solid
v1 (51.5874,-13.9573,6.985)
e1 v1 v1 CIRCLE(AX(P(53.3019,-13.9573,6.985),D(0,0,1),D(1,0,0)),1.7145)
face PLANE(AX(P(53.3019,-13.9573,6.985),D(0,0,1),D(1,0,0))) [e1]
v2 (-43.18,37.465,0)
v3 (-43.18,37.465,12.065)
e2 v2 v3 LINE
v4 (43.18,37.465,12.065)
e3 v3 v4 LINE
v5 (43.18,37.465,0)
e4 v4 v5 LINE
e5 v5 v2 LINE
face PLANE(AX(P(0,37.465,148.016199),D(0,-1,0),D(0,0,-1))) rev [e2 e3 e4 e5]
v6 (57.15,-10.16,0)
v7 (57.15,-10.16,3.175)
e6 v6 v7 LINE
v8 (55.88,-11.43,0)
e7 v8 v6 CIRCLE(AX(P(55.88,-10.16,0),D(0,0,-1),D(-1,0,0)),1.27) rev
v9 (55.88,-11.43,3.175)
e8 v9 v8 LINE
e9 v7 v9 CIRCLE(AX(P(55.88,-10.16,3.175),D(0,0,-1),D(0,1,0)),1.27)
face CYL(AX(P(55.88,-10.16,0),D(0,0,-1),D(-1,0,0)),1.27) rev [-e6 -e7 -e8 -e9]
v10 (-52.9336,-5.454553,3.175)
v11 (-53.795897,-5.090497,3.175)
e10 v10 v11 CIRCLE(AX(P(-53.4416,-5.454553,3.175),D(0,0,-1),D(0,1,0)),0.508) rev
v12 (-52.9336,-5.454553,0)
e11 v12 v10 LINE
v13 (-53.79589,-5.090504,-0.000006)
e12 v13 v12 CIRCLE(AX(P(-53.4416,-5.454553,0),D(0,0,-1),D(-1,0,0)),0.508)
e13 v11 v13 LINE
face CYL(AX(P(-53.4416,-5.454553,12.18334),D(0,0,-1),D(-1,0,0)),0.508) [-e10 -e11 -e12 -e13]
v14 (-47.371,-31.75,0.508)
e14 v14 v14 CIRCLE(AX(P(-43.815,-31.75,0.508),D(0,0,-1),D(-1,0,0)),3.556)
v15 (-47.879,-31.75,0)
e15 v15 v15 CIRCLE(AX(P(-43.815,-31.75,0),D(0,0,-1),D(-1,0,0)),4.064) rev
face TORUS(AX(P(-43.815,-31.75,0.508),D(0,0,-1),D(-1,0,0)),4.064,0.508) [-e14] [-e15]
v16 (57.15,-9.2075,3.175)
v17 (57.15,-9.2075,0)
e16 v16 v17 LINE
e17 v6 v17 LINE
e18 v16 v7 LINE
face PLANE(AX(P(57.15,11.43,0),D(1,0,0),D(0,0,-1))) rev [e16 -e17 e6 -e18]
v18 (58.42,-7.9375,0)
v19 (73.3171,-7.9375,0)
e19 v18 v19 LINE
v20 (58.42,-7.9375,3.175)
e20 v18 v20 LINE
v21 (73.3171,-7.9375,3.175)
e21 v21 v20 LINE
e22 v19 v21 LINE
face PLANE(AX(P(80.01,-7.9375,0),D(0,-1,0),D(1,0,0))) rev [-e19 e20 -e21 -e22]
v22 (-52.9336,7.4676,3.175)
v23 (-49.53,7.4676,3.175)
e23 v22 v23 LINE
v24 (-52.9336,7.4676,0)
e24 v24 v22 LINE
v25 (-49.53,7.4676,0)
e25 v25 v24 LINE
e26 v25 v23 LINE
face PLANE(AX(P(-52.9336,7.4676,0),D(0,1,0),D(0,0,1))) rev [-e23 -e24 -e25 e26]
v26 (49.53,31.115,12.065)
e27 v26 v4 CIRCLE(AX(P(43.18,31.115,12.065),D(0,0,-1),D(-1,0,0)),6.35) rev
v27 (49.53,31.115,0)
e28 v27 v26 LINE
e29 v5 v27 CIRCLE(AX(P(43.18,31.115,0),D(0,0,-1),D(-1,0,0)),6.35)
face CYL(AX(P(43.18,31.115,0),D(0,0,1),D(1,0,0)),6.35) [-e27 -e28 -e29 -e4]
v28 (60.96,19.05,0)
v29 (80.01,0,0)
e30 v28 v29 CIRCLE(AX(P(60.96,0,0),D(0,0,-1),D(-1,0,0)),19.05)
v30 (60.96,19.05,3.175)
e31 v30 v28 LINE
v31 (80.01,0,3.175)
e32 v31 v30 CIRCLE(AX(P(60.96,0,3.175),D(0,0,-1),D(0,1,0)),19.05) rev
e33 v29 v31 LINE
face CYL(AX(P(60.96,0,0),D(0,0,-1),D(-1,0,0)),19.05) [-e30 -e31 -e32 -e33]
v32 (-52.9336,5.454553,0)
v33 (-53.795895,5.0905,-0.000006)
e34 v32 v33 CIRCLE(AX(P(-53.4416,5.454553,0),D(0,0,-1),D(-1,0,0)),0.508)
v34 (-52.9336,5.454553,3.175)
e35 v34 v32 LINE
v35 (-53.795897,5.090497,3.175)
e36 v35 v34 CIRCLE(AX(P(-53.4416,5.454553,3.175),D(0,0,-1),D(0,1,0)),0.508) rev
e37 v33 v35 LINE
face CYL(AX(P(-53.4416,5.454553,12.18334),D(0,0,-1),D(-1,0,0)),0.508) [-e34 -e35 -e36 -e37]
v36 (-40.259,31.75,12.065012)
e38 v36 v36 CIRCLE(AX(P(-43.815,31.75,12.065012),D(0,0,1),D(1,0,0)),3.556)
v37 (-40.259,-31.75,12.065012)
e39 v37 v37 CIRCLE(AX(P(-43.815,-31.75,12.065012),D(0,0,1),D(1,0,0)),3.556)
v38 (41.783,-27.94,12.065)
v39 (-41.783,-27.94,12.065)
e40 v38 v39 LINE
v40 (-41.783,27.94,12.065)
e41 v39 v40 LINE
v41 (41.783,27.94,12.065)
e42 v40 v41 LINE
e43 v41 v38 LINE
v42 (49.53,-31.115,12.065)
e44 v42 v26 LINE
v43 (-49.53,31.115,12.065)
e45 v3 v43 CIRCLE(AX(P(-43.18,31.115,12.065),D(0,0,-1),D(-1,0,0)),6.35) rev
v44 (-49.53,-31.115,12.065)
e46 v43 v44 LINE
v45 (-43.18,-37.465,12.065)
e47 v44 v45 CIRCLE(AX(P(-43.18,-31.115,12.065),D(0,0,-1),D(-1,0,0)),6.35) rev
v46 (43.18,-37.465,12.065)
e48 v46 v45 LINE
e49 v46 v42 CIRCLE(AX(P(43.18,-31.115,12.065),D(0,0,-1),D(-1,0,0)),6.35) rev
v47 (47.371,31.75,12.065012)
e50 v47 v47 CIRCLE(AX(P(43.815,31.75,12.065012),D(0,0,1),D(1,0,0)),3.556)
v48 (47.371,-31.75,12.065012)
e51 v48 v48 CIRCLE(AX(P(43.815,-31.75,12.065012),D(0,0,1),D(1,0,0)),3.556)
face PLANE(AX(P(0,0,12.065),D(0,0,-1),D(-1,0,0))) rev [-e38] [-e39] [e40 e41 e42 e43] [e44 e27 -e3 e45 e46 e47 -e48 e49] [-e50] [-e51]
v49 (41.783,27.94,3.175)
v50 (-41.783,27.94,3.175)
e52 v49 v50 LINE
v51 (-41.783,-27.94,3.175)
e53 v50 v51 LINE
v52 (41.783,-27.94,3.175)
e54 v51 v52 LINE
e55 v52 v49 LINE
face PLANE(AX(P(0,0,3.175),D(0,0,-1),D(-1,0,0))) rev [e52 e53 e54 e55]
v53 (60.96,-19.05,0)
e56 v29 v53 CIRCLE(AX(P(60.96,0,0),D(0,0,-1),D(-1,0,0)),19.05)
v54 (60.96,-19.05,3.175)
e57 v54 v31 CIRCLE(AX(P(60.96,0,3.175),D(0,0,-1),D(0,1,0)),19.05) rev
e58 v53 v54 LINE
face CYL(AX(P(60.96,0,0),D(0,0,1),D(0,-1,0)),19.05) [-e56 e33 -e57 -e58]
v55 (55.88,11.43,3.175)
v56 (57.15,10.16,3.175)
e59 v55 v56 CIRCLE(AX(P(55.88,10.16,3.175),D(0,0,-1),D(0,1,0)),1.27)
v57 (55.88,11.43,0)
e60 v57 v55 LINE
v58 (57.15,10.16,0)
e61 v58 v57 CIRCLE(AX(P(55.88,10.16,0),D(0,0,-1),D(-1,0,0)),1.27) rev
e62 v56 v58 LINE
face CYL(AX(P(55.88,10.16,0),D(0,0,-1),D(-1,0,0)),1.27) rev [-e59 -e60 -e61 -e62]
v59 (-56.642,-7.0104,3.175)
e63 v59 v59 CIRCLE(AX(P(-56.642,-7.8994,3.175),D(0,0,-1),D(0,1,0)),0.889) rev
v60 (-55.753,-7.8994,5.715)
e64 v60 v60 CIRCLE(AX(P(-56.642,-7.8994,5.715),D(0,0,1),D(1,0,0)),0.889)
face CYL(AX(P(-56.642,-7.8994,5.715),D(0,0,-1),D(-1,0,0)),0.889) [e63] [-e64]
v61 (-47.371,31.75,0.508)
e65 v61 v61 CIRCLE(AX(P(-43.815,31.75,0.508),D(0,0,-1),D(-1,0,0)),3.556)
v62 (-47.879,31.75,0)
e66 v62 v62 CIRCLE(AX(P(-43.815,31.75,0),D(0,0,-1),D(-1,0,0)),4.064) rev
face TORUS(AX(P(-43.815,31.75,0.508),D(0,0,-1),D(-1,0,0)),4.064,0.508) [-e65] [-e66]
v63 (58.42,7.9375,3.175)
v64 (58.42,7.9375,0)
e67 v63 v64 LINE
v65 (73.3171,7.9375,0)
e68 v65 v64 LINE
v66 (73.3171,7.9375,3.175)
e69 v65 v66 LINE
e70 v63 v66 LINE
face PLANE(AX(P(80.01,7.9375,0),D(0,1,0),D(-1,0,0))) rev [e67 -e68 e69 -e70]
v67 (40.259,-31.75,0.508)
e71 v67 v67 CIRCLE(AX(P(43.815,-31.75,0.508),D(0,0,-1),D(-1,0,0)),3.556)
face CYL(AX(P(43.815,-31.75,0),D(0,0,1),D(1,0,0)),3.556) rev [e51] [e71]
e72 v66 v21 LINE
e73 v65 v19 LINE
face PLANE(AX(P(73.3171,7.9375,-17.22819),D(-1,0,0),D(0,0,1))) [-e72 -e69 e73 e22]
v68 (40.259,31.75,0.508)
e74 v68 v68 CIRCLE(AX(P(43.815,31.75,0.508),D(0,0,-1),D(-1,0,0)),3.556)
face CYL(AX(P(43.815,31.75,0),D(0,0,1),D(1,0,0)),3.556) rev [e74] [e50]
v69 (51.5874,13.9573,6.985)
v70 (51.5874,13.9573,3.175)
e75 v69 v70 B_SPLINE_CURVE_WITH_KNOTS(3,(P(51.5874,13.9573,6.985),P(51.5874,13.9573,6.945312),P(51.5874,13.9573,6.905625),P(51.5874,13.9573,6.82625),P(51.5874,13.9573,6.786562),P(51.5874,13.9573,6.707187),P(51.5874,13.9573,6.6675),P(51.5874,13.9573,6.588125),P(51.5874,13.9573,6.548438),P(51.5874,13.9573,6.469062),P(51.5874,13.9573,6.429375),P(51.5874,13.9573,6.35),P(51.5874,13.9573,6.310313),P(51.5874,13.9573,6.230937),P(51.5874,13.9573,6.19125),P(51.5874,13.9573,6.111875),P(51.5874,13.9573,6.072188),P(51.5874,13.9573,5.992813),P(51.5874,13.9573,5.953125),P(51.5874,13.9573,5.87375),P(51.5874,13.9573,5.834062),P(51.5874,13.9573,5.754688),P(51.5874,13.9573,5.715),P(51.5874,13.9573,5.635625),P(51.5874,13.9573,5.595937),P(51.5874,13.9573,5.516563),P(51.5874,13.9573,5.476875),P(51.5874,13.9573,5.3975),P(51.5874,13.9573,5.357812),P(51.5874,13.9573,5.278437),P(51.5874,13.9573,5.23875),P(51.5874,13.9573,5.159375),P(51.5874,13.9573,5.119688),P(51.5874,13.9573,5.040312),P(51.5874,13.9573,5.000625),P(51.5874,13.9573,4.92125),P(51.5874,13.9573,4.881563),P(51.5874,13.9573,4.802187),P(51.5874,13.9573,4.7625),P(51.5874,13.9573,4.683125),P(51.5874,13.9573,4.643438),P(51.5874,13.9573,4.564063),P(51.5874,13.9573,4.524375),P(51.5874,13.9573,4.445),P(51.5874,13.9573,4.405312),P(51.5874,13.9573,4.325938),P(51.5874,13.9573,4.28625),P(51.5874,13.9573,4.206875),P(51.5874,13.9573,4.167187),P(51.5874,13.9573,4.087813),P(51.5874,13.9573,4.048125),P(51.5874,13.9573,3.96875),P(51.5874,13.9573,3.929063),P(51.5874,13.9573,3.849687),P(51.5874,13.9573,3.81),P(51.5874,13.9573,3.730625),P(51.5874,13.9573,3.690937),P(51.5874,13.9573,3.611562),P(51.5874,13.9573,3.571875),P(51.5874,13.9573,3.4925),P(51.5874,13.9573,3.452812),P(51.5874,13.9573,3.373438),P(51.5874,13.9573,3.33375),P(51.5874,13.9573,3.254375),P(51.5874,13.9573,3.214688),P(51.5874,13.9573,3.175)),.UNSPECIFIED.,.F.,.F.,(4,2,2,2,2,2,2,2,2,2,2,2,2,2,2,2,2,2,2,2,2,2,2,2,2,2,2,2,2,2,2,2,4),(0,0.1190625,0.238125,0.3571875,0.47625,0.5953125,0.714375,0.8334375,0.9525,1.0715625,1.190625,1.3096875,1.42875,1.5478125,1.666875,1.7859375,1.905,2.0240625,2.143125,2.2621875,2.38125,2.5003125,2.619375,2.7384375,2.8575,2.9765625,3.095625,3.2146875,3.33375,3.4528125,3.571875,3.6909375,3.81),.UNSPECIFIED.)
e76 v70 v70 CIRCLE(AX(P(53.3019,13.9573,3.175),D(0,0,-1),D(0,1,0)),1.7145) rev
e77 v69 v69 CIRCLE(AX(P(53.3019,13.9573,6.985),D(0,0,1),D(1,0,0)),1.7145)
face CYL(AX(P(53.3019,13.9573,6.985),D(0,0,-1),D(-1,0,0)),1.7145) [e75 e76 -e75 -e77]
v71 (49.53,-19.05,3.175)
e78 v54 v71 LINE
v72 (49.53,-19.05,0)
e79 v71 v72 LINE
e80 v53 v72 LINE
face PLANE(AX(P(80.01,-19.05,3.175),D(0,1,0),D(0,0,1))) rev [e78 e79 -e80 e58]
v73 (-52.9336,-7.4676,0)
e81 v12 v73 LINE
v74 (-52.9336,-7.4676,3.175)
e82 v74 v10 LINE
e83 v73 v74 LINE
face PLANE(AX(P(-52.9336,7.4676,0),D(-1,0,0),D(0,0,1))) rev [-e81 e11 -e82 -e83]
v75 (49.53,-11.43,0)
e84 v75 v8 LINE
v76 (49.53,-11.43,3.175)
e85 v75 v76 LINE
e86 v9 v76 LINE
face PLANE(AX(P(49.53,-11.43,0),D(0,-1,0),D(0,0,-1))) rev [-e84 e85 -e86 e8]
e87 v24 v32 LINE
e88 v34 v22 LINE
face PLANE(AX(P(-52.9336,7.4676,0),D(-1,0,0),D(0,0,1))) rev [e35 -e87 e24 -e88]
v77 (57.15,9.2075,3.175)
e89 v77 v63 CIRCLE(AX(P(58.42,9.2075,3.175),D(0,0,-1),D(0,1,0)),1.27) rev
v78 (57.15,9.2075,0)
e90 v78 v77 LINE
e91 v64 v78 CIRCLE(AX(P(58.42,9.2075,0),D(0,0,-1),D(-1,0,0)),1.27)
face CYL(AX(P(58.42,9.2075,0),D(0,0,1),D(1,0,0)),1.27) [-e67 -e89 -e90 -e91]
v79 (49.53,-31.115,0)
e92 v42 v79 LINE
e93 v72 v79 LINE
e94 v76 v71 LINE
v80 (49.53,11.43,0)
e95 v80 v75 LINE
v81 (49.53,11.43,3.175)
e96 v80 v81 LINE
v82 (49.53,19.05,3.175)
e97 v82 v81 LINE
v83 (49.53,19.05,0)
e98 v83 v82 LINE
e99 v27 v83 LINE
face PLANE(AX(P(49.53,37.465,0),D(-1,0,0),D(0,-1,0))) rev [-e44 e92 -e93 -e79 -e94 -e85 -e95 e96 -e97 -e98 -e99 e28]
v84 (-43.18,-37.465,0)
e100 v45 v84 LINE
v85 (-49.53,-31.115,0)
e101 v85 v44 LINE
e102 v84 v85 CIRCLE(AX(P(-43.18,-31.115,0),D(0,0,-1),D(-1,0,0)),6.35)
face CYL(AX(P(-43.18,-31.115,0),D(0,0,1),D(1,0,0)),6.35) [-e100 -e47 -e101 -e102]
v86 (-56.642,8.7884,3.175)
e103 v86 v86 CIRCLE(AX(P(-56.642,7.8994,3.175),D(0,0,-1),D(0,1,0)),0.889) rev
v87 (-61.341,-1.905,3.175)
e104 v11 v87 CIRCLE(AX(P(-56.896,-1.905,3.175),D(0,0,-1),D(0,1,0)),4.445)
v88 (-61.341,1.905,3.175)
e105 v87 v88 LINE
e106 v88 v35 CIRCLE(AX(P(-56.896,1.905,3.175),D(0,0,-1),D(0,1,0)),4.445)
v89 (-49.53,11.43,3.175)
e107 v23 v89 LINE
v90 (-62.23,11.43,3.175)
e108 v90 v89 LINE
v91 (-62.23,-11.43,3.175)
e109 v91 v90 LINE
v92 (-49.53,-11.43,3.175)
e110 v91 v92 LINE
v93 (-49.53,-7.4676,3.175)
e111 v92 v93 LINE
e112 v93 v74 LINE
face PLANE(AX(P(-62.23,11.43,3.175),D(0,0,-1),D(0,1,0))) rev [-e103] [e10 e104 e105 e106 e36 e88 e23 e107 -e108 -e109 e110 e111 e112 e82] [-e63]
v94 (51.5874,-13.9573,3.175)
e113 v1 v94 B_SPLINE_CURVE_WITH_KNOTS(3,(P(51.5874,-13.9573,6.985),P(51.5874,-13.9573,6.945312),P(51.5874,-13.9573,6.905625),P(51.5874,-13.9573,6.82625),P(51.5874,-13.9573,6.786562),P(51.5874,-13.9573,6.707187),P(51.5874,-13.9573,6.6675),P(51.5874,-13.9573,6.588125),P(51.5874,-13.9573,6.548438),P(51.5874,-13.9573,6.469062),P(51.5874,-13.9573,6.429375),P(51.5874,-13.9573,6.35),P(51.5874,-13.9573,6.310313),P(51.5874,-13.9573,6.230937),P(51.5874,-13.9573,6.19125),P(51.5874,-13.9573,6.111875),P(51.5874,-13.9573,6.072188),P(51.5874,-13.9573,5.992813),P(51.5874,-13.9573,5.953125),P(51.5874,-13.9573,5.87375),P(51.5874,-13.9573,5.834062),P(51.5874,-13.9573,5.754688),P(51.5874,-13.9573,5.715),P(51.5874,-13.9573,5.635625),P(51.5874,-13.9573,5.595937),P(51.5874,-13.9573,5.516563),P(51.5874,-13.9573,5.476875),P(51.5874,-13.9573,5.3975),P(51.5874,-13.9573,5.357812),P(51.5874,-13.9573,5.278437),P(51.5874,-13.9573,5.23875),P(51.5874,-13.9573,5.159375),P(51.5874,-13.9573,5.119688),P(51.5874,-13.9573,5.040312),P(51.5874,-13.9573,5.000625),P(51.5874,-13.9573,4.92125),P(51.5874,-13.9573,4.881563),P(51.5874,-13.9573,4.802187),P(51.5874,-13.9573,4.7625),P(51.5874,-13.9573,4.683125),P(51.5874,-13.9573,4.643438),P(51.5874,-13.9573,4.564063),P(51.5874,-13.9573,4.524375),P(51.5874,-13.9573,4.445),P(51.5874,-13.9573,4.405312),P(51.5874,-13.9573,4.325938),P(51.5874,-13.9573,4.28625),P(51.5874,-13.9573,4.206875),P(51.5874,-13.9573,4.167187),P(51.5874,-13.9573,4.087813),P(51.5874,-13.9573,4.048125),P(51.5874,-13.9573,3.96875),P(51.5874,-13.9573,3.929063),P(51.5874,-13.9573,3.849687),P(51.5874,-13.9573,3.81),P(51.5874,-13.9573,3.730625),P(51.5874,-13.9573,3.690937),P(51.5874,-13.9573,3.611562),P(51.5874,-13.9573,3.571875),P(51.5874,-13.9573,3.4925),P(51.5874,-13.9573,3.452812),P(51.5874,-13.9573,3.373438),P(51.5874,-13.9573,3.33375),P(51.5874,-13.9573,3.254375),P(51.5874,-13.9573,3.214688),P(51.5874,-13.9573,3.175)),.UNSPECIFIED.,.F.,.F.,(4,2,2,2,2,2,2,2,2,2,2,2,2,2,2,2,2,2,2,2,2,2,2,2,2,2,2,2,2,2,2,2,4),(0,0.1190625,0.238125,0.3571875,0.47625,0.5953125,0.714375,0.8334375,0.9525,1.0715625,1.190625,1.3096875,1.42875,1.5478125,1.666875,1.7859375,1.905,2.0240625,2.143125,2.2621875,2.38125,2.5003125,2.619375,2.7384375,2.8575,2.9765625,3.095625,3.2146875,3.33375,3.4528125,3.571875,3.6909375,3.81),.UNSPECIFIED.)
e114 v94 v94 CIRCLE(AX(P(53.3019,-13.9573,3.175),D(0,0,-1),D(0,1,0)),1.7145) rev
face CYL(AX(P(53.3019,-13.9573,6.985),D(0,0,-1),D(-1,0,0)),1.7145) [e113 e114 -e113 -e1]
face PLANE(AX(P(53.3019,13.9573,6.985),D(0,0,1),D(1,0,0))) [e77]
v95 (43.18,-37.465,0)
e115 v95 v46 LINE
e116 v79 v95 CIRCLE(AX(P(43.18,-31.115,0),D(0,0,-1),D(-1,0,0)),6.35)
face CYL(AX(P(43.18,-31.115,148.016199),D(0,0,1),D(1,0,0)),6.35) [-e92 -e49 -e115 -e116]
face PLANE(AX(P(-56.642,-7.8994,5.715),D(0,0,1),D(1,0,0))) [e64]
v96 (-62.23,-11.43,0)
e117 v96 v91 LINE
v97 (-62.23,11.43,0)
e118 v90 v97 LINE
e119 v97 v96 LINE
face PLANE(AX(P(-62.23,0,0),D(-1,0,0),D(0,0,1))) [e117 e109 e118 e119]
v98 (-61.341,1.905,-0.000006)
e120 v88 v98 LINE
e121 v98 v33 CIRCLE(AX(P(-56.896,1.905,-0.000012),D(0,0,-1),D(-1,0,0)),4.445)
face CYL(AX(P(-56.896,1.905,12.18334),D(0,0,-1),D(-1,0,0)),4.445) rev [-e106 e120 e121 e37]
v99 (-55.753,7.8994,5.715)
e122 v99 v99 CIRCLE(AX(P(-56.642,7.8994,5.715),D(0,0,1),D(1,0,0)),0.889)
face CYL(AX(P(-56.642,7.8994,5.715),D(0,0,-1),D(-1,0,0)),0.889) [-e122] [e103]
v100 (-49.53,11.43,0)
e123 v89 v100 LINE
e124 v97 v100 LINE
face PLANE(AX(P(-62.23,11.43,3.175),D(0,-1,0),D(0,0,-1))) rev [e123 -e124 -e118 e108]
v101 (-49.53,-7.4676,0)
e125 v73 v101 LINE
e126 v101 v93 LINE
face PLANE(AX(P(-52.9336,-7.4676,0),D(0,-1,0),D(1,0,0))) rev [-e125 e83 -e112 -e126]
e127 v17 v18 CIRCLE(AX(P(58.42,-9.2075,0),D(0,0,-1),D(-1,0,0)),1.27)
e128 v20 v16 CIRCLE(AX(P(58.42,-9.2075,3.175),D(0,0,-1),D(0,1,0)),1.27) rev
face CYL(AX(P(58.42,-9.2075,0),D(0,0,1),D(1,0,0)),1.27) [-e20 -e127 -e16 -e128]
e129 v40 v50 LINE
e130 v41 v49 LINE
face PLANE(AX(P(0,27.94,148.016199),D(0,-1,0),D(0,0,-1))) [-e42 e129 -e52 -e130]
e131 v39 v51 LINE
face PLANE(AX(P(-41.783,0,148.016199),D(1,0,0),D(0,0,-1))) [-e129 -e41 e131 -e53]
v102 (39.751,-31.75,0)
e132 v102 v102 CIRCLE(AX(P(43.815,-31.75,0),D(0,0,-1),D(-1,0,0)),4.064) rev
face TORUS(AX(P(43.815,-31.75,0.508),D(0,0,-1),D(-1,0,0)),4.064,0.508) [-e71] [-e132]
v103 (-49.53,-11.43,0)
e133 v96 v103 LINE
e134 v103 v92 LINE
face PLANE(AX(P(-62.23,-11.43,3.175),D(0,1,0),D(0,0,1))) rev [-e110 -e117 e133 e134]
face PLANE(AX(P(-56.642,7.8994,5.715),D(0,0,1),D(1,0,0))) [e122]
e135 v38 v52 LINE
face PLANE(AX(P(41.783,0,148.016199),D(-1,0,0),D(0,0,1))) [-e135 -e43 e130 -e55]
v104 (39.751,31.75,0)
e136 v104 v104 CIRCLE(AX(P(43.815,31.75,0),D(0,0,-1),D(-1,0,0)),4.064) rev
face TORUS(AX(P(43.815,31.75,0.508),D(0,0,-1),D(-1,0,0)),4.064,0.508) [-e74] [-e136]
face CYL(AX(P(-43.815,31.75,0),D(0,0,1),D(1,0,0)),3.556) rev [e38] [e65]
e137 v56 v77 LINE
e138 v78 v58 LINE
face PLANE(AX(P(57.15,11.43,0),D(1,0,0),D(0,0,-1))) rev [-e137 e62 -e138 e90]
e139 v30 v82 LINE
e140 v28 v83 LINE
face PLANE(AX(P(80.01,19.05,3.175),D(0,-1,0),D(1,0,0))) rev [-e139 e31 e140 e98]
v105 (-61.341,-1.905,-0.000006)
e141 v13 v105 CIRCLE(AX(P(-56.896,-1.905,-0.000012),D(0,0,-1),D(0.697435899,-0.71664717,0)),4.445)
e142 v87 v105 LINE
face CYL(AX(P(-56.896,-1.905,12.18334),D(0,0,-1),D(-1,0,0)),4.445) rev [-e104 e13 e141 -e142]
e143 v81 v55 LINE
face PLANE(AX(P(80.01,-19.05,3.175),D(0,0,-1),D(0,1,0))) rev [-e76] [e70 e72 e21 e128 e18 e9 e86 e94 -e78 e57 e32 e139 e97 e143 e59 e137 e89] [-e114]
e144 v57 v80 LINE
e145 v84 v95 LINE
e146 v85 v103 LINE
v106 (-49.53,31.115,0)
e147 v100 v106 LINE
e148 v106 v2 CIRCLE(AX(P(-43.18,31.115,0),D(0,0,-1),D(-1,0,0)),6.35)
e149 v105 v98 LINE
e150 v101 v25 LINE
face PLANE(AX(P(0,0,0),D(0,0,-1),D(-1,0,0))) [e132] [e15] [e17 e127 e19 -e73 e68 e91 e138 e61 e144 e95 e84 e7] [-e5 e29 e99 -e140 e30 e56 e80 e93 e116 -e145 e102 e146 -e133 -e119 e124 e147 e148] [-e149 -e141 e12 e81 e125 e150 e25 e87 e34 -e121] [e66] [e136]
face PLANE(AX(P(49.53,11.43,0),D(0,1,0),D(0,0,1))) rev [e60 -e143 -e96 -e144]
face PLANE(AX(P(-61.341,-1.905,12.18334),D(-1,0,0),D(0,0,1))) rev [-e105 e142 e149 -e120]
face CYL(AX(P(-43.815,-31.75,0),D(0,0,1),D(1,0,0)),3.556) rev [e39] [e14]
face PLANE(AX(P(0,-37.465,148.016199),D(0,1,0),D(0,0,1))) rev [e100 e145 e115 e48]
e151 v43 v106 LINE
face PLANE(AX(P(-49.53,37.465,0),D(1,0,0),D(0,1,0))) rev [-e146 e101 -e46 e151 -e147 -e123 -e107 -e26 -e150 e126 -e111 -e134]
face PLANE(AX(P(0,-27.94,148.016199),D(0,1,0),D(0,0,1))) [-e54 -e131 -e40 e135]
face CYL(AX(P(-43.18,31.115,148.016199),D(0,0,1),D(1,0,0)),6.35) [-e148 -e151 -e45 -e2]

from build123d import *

# Parameters (mm, degrees)
SKETCH1_W               = 55.88
SKETCH1_H               = 83.566
BOSS_EXTRUDE1_DEPTH     = 3.175
SKETCH2_W               = 74.93
SKETCH2_H               = 102.616
SKETCH2_W_2             = 55.88
SKETCH2_H_2             = 83.566
BOSS_EXTRUDE2_DEPTH     = 12.065
CUT_EXTRUDE1_DEPTH      = 65.666075449
CUT_EXTRUDE1_DEPTH_BACK = 65.666075449
SKETCH3_R               = 3.556
CUT_EXTRUDE2_DEPTH      = 65.666075449
CUT_EXTRUDE2_DEPTH_BACK = 65.666075449
SKETCH4_W               = 1.778
SKETCH4_H               = 74.93
FILLET1_R               = 6.35
FILLET2_R               = 0.508
SKETCH5_W               = 38.1
SKETCH5_H               = 3.175
BOSS_EXTRUDE3_DEPTH     = 30.48
CUT_EXTRUDE3_DEPTH      = 89.793346738
CUT_EXTRUDE3_DEPTH_BACK = 89.793346738
SKETCH6_W               = 7.62
SKETCH6_H               = 22.86
SKETCH7_R               = 1.7145
BOSS_EXTRUDE4_DEPTH     = 3.81
CUT_EXTRUDE4_DEPTH      = 89.793346738
CUT_EXTRUDE4_DEPTH_BACK = 89.793346738
SKETCH8_W               = 22.86
SKETCH8_H               = 15.875
SKETCH9_W               = 6.6929
SKETCH9_H               = 15.875
BOSS_EXTRUDE5_DEPTH     = 3.175
FILLET3_R               = 19.05
FILLET5_R               = 1.27
SKETCH10_W              = 22.86
SKETCH10_H              = 3.175
BOSS_EXTRUDE6_DEPTH     = 12.7
CUT_EXTRUDE5_DEPTH      = 89.793346738
CUT_EXTRUDE5_DEPTH_BACK = 89.793346738
SKETCH11_W              = 3.4036
SKETCH11_H              = 14.9352
CUT_EXTRUDE6_DEPTH      = 90.167205575
CUT_EXTRUDE6_DEPTH_BACK = 90.167205575
FILLET7_R               = 0.508
SKETCH13_R              = 0.889
BOSS_EXTRUDE7_DEPTH     = 2.54


with BuildPart() as part:
    # Sketch1 → Boss-Extrude1 (new body)
    with BuildSketch(Plane(origin=(0, 0, 0), x_dir=(0, 1, 0), z_dir=(0, 0, 1))):
        Rectangle(SKETCH1_W, SKETCH1_H)
    extrude(amount=BOSS_EXTRUDE1_DEPTH)

    # Sketch2 → Boss-Extrude2 (add)
    with BuildSketch(Plane(origin=(0, 0, 0), x_dir=(0, 1, 0), z_dir=(0, 0, 1))):
        Rectangle(SKETCH2_W, SKETCH2_H)
        Rectangle(SKETCH2_W_2, SKETCH2_H_2, mode=Mode.SUBTRACT)
    extrude(amount=BOSS_EXTRUDE2_DEPTH)

    # Sketch3 → Cut-Extrude1 (cut, two sides: drawn at the far end of the back side and taken through both)
    with BuildSketch(Plane.XY.offset(12.065).offset(-CUT_EXTRUDE1_DEPTH_BACK)):
        with Locations((-43.815, 31.75)):
            Circle(SKETCH3_R)
        with Locations((43.815, 31.75)):
            Circle(SKETCH3_R)
        with Locations((43.815, -31.75)):
            Circle(SKETCH3_R)
        with Locations((-43.815, -31.75)):
            Circle(SKETCH3_R)
    extrude(amount=CUT_EXTRUDE1_DEPTH + CUT_EXTRUDE1_DEPTH_BACK, mode=Mode.SUBTRACT)

    # Sketch4 → Cut-Extrude2 (cut, two sides: drawn at the far end of the back side and taken through both)
    with BuildSketch(Plane.XY.offset(12.065).offset(-CUT_EXTRUDE2_DEPTH_BACK)):
        with Locations((-50.419, 0)):
            Rectangle(SKETCH4_W, SKETCH4_H)
        with Locations((50.419, 0)):
            Rectangle(SKETCH4_W, SKETCH4_H)
    extrude(amount=CUT_EXTRUDE2_DEPTH + CUT_EXTRUDE2_DEPTH_BACK, mode=Mode.SUBTRACT)

    # Fillet1
    fillet1_edges = [part.edges().sort_by_distance(p)[0] for p in [
        (-49.53, -37.465, 6.0325),
        (-49.53, 37.465, 6.0325),
        (49.53, 37.465, 6.0325),
        (49.53, -37.465, 6.0325),
    ]]
    fillet(fillet1_edges, radius=FILLET1_R)

    # Fillet2
    fillet2_edges = [part.edges().sort_by_distance(p)[0] for p in [
        (-47.371, -31.75, 0),
        (40.259, -31.75, 0),
        (40.259, 31.75, 0),
        (-47.371, 31.75, 0),
    ]]
    fillet(fillet2_edges, radius=FILLET2_R)

    # Sketch5 → Boss-Extrude3 (add)
    with BuildSketch(Plane.YZ.offset(49.53)):
        with Locations((0, 1.5875)):
            Rectangle(SKETCH5_W, SKETCH5_H)
    extrude(amount=BOSS_EXTRUDE3_DEPTH)

    # Sketch6 → Cut-Extrude3 (cut, two sides: drawn at the far end of the back side and taken through both)
    with BuildSketch(Plane.XY.offset(3.175).offset(-CUT_EXTRUDE3_DEPTH_BACK)):
        with Locations((53.34, 0)):
            Rectangle(SKETCH6_W, SKETCH6_H)
    extrude(amount=CUT_EXTRUDE3_DEPTH + CUT_EXTRUDE3_DEPTH_BACK, mode=Mode.SUBTRACT)

    # Sketch7 → Boss-Extrude4 (add)
    with BuildSketch(Plane.XY.offset(3.175)):
        with Locations(Location((53.3019, 13.9573, 0), (0, 0, 180))):
            Circle(SKETCH7_R)
        with Locations(Location((53.3019, -13.9573, 0), (0, 0, 180))):
            Circle(SKETCH7_R)
    extrude(amount=BOSS_EXTRUDE4_DEPTH)

    # Sketch8 → Cut-Extrude4 (cut, two sides: drawn at the far end of the back side and taken through both)
    with BuildSketch(Plane.XY.offset(3.175).offset(-CUT_EXTRUDE4_DEPTH_BACK)):
        with Locations((68.58, 0)):
            Rectangle(SKETCH8_W, SKETCH8_H)
    extrude(amount=CUT_EXTRUDE4_DEPTH + CUT_EXTRUDE4_DEPTH_BACK, mode=Mode.SUBTRACT)

    # Sketch9 → Boss-Extrude5 (add)
    with BuildSketch(Plane.XY.offset(3.175)):
        with Locations((76.66355, 0)):
            Rectangle(SKETCH9_W, SKETCH9_H)
    extrude(amount=-BOSS_EXTRUDE5_DEPTH)

    # Fillet3
    fillet3_edges = [part.edges().sort_by_distance(p)[0] for p in [
        (80.01, -19.05, 1.5875),
        (80.01, 19.05, 1.5875),
    ]]
    fillet(fillet3_edges, radius=FILLET3_R - 0.0001)  # a hair under: the kernel refuses the full size

    # Fillet5
    fillet5_edges = [part.edges().sort_by_distance(p)[0] for p in [
        (57.15, 11.43, 1.5875),
        (57.15, -11.43, 1.5875),
        (57.15, 7.9375, 1.5875),
        (57.15, -7.9375, 1.5875),
    ]]
    fillet(fillet5_edges, radius=FILLET5_R)

    # Sketch10 → Boss-Extrude6 (add)
    with BuildSketch(Plane(origin=(-49.53, 0, 0), x_dir=(0, -1, 0), z_dir=(-1, 0, 0))):
        with Locations((0, 1.5875)):
            Rectangle(SKETCH10_W, SKETCH10_H)
    extrude(amount=BOSS_EXTRUDE6_DEPTH)

    # Sketch11 → Cut-Extrude5 (cut, two sides: drawn at the far end of the back side and taken through both)
    with BuildSketch(Plane.XY.offset(3.175).offset(-CUT_EXTRUDE5_DEPTH_BACK)):
        with Locations((-51.2318, 0)):
            Rectangle(SKETCH11_W, SKETCH11_H)
    extrude(amount=CUT_EXTRUDE5_DEPTH + CUT_EXTRUDE5_DEPTH_BACK, mode=Mode.SUBTRACT)

    # Sketch12 → Cut-Extrude6 (cut, two sides: drawn at the far end of the back side and taken through both)
    with BuildSketch(Plane(origin=(0, 0, 0), x_dir=(1, 0, 0), z_dir=(0, 0, -1)).offset(-CUT_EXTRUDE6_DEPTH_BACK)):
        with BuildLine():
            Line((-52.451, 1.905), (-52.451, -1.905))
            ThreePointArc((-52.451, -1.905), (-56.896, -6.35), (-61.341, -1.905))
            Line((-61.341, -1.905), (-61.341, 1.905))
            ThreePointArc((-61.341, 1.905), (-56.896, 6.35), (-52.451, 1.905))
        make_face()
    extrude(amount=CUT_EXTRUDE6_DEPTH + CUT_EXTRUDE6_DEPTH_BACK, mode=Mode.SUBTRACT)

    # Fillet7
    fillet7_edges = [part.edges().sort_by_distance(p)[0] for p in [
        (-52.9336, 3.919301676, 1.5875),
        (-52.9336, -3.919301676, 1.5875),
    ]]
    fillet(fillet7_edges, radius=FILLET7_R)

    # Sketch13 → Boss-Extrude7 (add)
    with BuildSketch(Plane.XY.offset(3.175)):
        with Locations(Location((-56.642, 7.8994, 0), (0, 0, 90))):
            Circle(SKETCH13_R)
        with Locations(Location((-56.642, -7.8994, 0), (0, 0, 90))):
            Circle(SKETCH13_R)
    extrude(amount=BOSS_EXTRUDE7_DEPTH)


solid = part.part
